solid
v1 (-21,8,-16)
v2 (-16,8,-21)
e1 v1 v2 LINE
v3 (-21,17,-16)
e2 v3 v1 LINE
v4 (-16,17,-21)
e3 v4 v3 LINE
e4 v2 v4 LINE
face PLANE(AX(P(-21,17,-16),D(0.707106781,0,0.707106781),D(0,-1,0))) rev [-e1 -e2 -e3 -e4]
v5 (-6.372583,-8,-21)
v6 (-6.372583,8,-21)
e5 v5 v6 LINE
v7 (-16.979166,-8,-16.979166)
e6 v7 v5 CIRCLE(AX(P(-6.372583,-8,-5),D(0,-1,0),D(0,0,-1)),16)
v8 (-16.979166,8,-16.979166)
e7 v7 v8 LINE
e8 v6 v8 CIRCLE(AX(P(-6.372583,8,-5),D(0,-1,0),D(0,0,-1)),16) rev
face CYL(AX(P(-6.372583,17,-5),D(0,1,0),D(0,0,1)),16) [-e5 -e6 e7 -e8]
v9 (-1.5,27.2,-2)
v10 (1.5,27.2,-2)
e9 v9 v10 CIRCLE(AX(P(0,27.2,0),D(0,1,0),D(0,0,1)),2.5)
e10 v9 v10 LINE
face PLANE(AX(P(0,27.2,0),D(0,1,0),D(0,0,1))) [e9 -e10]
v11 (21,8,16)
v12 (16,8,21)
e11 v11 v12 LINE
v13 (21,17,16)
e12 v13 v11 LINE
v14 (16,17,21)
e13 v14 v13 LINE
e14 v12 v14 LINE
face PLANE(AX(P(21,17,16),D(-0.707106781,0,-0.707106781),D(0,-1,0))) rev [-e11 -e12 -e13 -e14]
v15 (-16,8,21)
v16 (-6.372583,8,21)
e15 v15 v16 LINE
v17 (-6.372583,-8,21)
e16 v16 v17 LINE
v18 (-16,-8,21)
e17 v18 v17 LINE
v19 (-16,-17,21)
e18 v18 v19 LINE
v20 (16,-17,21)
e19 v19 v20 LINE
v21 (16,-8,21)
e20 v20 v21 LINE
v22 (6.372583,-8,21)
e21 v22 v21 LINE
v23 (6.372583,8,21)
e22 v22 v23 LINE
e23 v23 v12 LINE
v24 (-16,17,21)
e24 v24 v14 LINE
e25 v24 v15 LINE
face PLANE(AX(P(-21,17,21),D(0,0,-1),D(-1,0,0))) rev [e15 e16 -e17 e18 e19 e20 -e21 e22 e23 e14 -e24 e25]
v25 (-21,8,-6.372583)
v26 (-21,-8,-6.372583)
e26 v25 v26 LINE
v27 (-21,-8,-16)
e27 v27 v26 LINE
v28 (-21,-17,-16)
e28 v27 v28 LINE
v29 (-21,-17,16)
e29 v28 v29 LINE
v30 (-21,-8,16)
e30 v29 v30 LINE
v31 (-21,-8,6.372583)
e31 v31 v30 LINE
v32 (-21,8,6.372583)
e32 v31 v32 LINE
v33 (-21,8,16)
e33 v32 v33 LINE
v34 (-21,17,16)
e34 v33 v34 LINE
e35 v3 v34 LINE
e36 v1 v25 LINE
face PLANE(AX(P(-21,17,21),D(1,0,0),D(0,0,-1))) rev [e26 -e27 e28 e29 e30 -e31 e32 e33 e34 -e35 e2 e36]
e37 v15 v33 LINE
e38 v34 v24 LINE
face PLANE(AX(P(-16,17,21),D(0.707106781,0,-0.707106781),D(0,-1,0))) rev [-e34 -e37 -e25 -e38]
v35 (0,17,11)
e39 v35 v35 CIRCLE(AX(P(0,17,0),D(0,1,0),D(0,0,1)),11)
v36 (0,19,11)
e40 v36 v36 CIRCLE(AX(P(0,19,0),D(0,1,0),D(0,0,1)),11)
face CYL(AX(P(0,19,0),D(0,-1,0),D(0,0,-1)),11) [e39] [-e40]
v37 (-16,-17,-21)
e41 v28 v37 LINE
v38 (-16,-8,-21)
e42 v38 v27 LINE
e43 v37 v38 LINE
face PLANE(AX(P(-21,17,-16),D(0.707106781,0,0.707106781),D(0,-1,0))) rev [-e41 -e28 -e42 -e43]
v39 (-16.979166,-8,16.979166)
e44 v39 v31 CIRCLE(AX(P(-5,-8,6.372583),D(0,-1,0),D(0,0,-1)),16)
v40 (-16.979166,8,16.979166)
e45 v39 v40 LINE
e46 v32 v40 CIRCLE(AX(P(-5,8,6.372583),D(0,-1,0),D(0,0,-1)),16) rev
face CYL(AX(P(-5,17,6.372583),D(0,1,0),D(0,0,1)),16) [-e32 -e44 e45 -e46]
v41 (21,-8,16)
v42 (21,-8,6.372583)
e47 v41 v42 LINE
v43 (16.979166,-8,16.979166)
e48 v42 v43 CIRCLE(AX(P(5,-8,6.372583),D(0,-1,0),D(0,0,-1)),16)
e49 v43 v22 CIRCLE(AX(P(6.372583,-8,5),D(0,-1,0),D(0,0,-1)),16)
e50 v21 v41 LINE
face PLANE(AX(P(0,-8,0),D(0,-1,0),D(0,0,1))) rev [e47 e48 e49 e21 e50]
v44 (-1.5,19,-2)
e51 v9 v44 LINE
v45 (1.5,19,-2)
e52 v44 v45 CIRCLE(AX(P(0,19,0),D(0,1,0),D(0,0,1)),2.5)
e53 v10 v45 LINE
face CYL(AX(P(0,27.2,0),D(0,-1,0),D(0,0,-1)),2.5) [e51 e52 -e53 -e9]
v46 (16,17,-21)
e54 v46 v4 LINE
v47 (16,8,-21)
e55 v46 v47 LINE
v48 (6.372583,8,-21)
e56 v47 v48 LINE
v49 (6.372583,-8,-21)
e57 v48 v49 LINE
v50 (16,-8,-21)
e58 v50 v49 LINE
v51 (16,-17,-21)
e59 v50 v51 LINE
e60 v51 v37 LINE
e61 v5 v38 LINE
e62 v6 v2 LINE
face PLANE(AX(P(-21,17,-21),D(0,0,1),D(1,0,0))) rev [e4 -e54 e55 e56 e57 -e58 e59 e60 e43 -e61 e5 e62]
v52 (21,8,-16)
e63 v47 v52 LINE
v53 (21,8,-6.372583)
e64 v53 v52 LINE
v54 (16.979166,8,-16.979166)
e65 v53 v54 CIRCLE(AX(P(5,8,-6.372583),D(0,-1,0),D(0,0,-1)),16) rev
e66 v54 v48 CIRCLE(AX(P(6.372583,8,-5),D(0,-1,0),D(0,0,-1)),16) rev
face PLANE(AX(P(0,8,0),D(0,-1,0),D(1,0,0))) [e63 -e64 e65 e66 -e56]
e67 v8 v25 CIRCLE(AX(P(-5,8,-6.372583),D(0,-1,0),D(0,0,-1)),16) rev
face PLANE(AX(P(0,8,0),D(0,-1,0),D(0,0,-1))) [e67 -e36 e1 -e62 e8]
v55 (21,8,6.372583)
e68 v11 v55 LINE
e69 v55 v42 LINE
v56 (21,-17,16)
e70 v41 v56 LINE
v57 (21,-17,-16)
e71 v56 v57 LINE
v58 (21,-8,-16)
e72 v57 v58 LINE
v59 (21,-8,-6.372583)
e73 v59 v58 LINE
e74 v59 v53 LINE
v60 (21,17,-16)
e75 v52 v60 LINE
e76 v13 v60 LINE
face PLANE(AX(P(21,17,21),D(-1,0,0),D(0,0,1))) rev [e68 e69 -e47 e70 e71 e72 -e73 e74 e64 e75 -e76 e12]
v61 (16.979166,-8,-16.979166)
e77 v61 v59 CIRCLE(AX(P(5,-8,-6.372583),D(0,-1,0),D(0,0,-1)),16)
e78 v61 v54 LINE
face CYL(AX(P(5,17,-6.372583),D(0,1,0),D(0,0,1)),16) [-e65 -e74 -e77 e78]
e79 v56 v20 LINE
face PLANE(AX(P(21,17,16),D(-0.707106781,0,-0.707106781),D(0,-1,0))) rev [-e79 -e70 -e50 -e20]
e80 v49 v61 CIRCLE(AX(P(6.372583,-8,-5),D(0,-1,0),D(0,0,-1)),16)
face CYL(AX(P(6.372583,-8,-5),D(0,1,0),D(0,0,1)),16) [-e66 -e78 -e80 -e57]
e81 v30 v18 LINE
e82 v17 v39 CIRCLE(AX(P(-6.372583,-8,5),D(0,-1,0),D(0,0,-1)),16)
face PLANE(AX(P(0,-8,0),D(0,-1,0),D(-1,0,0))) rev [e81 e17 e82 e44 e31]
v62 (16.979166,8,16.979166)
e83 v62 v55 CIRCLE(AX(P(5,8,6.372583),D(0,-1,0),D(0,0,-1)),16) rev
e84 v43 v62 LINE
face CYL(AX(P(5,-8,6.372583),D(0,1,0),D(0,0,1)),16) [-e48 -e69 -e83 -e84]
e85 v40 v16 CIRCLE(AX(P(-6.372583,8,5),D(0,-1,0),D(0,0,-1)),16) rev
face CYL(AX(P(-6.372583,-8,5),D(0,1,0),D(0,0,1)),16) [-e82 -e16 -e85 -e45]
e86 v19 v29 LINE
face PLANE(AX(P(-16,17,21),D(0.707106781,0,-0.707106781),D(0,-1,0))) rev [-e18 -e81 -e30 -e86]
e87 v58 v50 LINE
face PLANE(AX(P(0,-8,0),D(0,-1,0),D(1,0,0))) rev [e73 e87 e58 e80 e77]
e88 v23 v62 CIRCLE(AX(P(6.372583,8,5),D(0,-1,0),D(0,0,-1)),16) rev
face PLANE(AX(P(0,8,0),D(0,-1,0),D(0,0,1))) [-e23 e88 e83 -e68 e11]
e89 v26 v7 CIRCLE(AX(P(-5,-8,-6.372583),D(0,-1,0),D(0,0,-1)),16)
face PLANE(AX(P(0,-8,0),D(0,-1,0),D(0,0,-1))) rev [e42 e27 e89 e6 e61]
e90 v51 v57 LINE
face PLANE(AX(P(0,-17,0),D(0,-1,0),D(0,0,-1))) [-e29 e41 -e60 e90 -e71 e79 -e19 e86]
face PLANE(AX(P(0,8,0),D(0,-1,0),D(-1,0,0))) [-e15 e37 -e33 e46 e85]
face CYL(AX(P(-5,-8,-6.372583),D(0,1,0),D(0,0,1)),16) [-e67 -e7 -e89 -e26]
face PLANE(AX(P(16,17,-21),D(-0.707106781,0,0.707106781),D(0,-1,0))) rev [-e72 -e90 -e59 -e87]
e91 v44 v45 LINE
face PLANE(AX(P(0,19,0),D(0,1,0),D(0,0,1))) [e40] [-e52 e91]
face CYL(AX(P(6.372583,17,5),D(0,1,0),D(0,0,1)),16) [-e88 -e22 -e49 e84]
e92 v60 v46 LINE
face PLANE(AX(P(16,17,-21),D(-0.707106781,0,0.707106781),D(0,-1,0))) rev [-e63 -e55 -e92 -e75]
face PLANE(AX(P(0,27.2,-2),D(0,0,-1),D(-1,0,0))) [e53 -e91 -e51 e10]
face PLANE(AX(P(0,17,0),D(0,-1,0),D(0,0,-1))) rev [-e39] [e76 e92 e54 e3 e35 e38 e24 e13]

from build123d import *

# Parameters (mm, degrees)
SKETCH_1_W               = 42
SKETCH_1_H               = 42
EXTRUDE_1_DEPTH          = 17
CUT_EXTRUDE_1_DEPTH      = 8
PATTERN_CIRCULAR_1_COUNT = 4
FILLET_1_R               = 16
CHAMFER_1_SIZE           = 5
SKETCH_3_R               = 11
EXTRUDE_2_DEPTH          = 2
EXTRUDE_3_DEPTH          = 8.2


with BuildPart() as part:
    # 스케치1 → 보스-돌출1 (new, symmetric)
    with BuildSketch(Plane(origin=(0, 0, 0), x_dir=(1, 0, 0), z_dir=(0, 1, 0))):
        Rectangle(SKETCH_1_W, SKETCH_1_H)
    extrude(amount=EXTRUDE_1_DEPTH, both=True)

    # 스케치2 → 컷-돌출1 (cut, symmetric)
    with BuildSketch(Plane(origin=(0, 0, 0), x_dir=(1, 0, 0), z_dir=(0, 1, 0))):
        Polygon((-21, 13), (-13, 21), (-21, 21), align=None)
    cut_extrude_1 = extrude(amount=CUT_EXTRUDE_1_DEPTH, both=True, mode=Mode.SUBTRACT)

    # 원형 패턴1: 컷-돌출1 ×4 about axis
    pattern_circular_1_axis = Axis((0, 0, 0), (0, 1, 0))
    for i in range(1, PATTERN_CIRCULAR_1_COUNT):
        add(cut_extrude_1.rotate(pattern_circular_1_axis, i * 360 / PATTERN_CIRCULAR_1_COUNT), mode=Mode.SUBTRACT)

    # 필렛1
    # the kernel refuses this fillet: 16 mm, written as the material it takes off along each edge
    with BuildSketch(Plane(origin=(21, -8, -13), x_dir=(0, 0, 1), z_dir=(0, 1, 0)), Plane(origin=(13, 8, -21), x_dir=(-1, 0, 0), z_dir=(0, -1, 0)), Plane(origin=(-21, 8, -13), x_dir=(0, 0, 1), z_dir=(0, -1, 0)), Plane(origin=(-13, 8, 21), x_dir=(1, 0, 0), z_dir=(0, -1, 0)), Plane(origin=(13, -8, 21), x_dir=(-1, 0, 0), z_dir=(0, 1, 0)), Plane(origin=(21, 8, 13), x_dir=(0, 0, -1), z_dir=(0, -1, 0))) as fillet_1_piece_1:
        with BuildLine():
            CenterArc((FILLET_1_R * 0.414213562373, -FILLET_1_R), FILLET_1_R, 90, 45)
            Line((-FILLET_1_R * 0.292893218813, -FILLET_1_R * 0.292893218813), (0, 0))
            Line((0, 0), (FILLET_1_R * 0.414213562373, 0))
        make_face()
    extrude(amount=16, mode=Mode.SUBTRACT)
    with BuildSketch(Plane(origin=(-13, -8, -21), x_dir=(-0.7071067811865475, 0, 0.7071067811865477), z_dir=(0, 1, 0)), Plane(origin=(-21, -8, 13), x_dir=(0.7071067811865472, 0, 0.7071067811865478), z_dir=(0, 1, 0))) as fillet_1_piece_2:
        with BuildLine():
            CenterArc((FILLET_1_R * 0.414213562373, FILLET_1_R), FILLET_1_R, 225, 45)
            Line((-FILLET_1_R * 0.292893218813, FILLET_1_R * 0.292893218813), (0, 0))
            Line((0, 0), (FILLET_1_R * 0.414213562373, 0))
        make_face()
    extrude(amount=16, mode=Mode.SUBTRACT)

    # 모따기1
    chamfer_1_edges = [part.edges().sort_by_distance(p)[0] for p in [
        (-21, -12.5, -21),
        (21, -12.5, 21),
        (-21, -12.5, 21),
        (21, -12.5, -21),
        (21, 12.5, 21),
        (-21, 12.5, 21),
        (-21, 12.5, -21),
        (21, 12.5, -21),
    ]]
    chamfer(chamfer_1_edges, length=CHAMFER_1_SIZE)

    # 스케치3 → 보스-돌출2 (add)
    with BuildSketch(Plane(origin=(0, 17, 0), x_dir=(1, 0, 0), z_dir=(0, 1, 0))):
        with Locations(Location((0, 0, 0), (0, 0, 270))):
            Circle(SKETCH_3_R)
    extrude(amount=EXTRUDE_2_DEPTH)

    # 스케치4 → 보스-돌출3 (add)
    with BuildSketch(Plane(origin=(0, 19, 0), x_dir=(1, 0, 0), z_dir=(0, 1, 0))):
        with BuildLine():
            Line((0, 2), (-1.5, 2))
            ThreePointArc((-1.5, 2), (-2.371708245, -0.790569415), (0, -2.5))
            Line((0, -2.5), (0, 2))
        make_face()
        with BuildLine():
            Line((1.5, 2), (0, 2))
            Line((0, 2), (0, -2.5))
            ThreePointArc((0, -2.5), (1.767766953, -1.767766953), (2.5, 0))
            ThreePointArc((2.5, 0), (2.236067977, 1.118033989), (1.5, 2))
        make_face()
    extrude(amount=EXTRUDE_3_DEPTH)


solid = part.part
